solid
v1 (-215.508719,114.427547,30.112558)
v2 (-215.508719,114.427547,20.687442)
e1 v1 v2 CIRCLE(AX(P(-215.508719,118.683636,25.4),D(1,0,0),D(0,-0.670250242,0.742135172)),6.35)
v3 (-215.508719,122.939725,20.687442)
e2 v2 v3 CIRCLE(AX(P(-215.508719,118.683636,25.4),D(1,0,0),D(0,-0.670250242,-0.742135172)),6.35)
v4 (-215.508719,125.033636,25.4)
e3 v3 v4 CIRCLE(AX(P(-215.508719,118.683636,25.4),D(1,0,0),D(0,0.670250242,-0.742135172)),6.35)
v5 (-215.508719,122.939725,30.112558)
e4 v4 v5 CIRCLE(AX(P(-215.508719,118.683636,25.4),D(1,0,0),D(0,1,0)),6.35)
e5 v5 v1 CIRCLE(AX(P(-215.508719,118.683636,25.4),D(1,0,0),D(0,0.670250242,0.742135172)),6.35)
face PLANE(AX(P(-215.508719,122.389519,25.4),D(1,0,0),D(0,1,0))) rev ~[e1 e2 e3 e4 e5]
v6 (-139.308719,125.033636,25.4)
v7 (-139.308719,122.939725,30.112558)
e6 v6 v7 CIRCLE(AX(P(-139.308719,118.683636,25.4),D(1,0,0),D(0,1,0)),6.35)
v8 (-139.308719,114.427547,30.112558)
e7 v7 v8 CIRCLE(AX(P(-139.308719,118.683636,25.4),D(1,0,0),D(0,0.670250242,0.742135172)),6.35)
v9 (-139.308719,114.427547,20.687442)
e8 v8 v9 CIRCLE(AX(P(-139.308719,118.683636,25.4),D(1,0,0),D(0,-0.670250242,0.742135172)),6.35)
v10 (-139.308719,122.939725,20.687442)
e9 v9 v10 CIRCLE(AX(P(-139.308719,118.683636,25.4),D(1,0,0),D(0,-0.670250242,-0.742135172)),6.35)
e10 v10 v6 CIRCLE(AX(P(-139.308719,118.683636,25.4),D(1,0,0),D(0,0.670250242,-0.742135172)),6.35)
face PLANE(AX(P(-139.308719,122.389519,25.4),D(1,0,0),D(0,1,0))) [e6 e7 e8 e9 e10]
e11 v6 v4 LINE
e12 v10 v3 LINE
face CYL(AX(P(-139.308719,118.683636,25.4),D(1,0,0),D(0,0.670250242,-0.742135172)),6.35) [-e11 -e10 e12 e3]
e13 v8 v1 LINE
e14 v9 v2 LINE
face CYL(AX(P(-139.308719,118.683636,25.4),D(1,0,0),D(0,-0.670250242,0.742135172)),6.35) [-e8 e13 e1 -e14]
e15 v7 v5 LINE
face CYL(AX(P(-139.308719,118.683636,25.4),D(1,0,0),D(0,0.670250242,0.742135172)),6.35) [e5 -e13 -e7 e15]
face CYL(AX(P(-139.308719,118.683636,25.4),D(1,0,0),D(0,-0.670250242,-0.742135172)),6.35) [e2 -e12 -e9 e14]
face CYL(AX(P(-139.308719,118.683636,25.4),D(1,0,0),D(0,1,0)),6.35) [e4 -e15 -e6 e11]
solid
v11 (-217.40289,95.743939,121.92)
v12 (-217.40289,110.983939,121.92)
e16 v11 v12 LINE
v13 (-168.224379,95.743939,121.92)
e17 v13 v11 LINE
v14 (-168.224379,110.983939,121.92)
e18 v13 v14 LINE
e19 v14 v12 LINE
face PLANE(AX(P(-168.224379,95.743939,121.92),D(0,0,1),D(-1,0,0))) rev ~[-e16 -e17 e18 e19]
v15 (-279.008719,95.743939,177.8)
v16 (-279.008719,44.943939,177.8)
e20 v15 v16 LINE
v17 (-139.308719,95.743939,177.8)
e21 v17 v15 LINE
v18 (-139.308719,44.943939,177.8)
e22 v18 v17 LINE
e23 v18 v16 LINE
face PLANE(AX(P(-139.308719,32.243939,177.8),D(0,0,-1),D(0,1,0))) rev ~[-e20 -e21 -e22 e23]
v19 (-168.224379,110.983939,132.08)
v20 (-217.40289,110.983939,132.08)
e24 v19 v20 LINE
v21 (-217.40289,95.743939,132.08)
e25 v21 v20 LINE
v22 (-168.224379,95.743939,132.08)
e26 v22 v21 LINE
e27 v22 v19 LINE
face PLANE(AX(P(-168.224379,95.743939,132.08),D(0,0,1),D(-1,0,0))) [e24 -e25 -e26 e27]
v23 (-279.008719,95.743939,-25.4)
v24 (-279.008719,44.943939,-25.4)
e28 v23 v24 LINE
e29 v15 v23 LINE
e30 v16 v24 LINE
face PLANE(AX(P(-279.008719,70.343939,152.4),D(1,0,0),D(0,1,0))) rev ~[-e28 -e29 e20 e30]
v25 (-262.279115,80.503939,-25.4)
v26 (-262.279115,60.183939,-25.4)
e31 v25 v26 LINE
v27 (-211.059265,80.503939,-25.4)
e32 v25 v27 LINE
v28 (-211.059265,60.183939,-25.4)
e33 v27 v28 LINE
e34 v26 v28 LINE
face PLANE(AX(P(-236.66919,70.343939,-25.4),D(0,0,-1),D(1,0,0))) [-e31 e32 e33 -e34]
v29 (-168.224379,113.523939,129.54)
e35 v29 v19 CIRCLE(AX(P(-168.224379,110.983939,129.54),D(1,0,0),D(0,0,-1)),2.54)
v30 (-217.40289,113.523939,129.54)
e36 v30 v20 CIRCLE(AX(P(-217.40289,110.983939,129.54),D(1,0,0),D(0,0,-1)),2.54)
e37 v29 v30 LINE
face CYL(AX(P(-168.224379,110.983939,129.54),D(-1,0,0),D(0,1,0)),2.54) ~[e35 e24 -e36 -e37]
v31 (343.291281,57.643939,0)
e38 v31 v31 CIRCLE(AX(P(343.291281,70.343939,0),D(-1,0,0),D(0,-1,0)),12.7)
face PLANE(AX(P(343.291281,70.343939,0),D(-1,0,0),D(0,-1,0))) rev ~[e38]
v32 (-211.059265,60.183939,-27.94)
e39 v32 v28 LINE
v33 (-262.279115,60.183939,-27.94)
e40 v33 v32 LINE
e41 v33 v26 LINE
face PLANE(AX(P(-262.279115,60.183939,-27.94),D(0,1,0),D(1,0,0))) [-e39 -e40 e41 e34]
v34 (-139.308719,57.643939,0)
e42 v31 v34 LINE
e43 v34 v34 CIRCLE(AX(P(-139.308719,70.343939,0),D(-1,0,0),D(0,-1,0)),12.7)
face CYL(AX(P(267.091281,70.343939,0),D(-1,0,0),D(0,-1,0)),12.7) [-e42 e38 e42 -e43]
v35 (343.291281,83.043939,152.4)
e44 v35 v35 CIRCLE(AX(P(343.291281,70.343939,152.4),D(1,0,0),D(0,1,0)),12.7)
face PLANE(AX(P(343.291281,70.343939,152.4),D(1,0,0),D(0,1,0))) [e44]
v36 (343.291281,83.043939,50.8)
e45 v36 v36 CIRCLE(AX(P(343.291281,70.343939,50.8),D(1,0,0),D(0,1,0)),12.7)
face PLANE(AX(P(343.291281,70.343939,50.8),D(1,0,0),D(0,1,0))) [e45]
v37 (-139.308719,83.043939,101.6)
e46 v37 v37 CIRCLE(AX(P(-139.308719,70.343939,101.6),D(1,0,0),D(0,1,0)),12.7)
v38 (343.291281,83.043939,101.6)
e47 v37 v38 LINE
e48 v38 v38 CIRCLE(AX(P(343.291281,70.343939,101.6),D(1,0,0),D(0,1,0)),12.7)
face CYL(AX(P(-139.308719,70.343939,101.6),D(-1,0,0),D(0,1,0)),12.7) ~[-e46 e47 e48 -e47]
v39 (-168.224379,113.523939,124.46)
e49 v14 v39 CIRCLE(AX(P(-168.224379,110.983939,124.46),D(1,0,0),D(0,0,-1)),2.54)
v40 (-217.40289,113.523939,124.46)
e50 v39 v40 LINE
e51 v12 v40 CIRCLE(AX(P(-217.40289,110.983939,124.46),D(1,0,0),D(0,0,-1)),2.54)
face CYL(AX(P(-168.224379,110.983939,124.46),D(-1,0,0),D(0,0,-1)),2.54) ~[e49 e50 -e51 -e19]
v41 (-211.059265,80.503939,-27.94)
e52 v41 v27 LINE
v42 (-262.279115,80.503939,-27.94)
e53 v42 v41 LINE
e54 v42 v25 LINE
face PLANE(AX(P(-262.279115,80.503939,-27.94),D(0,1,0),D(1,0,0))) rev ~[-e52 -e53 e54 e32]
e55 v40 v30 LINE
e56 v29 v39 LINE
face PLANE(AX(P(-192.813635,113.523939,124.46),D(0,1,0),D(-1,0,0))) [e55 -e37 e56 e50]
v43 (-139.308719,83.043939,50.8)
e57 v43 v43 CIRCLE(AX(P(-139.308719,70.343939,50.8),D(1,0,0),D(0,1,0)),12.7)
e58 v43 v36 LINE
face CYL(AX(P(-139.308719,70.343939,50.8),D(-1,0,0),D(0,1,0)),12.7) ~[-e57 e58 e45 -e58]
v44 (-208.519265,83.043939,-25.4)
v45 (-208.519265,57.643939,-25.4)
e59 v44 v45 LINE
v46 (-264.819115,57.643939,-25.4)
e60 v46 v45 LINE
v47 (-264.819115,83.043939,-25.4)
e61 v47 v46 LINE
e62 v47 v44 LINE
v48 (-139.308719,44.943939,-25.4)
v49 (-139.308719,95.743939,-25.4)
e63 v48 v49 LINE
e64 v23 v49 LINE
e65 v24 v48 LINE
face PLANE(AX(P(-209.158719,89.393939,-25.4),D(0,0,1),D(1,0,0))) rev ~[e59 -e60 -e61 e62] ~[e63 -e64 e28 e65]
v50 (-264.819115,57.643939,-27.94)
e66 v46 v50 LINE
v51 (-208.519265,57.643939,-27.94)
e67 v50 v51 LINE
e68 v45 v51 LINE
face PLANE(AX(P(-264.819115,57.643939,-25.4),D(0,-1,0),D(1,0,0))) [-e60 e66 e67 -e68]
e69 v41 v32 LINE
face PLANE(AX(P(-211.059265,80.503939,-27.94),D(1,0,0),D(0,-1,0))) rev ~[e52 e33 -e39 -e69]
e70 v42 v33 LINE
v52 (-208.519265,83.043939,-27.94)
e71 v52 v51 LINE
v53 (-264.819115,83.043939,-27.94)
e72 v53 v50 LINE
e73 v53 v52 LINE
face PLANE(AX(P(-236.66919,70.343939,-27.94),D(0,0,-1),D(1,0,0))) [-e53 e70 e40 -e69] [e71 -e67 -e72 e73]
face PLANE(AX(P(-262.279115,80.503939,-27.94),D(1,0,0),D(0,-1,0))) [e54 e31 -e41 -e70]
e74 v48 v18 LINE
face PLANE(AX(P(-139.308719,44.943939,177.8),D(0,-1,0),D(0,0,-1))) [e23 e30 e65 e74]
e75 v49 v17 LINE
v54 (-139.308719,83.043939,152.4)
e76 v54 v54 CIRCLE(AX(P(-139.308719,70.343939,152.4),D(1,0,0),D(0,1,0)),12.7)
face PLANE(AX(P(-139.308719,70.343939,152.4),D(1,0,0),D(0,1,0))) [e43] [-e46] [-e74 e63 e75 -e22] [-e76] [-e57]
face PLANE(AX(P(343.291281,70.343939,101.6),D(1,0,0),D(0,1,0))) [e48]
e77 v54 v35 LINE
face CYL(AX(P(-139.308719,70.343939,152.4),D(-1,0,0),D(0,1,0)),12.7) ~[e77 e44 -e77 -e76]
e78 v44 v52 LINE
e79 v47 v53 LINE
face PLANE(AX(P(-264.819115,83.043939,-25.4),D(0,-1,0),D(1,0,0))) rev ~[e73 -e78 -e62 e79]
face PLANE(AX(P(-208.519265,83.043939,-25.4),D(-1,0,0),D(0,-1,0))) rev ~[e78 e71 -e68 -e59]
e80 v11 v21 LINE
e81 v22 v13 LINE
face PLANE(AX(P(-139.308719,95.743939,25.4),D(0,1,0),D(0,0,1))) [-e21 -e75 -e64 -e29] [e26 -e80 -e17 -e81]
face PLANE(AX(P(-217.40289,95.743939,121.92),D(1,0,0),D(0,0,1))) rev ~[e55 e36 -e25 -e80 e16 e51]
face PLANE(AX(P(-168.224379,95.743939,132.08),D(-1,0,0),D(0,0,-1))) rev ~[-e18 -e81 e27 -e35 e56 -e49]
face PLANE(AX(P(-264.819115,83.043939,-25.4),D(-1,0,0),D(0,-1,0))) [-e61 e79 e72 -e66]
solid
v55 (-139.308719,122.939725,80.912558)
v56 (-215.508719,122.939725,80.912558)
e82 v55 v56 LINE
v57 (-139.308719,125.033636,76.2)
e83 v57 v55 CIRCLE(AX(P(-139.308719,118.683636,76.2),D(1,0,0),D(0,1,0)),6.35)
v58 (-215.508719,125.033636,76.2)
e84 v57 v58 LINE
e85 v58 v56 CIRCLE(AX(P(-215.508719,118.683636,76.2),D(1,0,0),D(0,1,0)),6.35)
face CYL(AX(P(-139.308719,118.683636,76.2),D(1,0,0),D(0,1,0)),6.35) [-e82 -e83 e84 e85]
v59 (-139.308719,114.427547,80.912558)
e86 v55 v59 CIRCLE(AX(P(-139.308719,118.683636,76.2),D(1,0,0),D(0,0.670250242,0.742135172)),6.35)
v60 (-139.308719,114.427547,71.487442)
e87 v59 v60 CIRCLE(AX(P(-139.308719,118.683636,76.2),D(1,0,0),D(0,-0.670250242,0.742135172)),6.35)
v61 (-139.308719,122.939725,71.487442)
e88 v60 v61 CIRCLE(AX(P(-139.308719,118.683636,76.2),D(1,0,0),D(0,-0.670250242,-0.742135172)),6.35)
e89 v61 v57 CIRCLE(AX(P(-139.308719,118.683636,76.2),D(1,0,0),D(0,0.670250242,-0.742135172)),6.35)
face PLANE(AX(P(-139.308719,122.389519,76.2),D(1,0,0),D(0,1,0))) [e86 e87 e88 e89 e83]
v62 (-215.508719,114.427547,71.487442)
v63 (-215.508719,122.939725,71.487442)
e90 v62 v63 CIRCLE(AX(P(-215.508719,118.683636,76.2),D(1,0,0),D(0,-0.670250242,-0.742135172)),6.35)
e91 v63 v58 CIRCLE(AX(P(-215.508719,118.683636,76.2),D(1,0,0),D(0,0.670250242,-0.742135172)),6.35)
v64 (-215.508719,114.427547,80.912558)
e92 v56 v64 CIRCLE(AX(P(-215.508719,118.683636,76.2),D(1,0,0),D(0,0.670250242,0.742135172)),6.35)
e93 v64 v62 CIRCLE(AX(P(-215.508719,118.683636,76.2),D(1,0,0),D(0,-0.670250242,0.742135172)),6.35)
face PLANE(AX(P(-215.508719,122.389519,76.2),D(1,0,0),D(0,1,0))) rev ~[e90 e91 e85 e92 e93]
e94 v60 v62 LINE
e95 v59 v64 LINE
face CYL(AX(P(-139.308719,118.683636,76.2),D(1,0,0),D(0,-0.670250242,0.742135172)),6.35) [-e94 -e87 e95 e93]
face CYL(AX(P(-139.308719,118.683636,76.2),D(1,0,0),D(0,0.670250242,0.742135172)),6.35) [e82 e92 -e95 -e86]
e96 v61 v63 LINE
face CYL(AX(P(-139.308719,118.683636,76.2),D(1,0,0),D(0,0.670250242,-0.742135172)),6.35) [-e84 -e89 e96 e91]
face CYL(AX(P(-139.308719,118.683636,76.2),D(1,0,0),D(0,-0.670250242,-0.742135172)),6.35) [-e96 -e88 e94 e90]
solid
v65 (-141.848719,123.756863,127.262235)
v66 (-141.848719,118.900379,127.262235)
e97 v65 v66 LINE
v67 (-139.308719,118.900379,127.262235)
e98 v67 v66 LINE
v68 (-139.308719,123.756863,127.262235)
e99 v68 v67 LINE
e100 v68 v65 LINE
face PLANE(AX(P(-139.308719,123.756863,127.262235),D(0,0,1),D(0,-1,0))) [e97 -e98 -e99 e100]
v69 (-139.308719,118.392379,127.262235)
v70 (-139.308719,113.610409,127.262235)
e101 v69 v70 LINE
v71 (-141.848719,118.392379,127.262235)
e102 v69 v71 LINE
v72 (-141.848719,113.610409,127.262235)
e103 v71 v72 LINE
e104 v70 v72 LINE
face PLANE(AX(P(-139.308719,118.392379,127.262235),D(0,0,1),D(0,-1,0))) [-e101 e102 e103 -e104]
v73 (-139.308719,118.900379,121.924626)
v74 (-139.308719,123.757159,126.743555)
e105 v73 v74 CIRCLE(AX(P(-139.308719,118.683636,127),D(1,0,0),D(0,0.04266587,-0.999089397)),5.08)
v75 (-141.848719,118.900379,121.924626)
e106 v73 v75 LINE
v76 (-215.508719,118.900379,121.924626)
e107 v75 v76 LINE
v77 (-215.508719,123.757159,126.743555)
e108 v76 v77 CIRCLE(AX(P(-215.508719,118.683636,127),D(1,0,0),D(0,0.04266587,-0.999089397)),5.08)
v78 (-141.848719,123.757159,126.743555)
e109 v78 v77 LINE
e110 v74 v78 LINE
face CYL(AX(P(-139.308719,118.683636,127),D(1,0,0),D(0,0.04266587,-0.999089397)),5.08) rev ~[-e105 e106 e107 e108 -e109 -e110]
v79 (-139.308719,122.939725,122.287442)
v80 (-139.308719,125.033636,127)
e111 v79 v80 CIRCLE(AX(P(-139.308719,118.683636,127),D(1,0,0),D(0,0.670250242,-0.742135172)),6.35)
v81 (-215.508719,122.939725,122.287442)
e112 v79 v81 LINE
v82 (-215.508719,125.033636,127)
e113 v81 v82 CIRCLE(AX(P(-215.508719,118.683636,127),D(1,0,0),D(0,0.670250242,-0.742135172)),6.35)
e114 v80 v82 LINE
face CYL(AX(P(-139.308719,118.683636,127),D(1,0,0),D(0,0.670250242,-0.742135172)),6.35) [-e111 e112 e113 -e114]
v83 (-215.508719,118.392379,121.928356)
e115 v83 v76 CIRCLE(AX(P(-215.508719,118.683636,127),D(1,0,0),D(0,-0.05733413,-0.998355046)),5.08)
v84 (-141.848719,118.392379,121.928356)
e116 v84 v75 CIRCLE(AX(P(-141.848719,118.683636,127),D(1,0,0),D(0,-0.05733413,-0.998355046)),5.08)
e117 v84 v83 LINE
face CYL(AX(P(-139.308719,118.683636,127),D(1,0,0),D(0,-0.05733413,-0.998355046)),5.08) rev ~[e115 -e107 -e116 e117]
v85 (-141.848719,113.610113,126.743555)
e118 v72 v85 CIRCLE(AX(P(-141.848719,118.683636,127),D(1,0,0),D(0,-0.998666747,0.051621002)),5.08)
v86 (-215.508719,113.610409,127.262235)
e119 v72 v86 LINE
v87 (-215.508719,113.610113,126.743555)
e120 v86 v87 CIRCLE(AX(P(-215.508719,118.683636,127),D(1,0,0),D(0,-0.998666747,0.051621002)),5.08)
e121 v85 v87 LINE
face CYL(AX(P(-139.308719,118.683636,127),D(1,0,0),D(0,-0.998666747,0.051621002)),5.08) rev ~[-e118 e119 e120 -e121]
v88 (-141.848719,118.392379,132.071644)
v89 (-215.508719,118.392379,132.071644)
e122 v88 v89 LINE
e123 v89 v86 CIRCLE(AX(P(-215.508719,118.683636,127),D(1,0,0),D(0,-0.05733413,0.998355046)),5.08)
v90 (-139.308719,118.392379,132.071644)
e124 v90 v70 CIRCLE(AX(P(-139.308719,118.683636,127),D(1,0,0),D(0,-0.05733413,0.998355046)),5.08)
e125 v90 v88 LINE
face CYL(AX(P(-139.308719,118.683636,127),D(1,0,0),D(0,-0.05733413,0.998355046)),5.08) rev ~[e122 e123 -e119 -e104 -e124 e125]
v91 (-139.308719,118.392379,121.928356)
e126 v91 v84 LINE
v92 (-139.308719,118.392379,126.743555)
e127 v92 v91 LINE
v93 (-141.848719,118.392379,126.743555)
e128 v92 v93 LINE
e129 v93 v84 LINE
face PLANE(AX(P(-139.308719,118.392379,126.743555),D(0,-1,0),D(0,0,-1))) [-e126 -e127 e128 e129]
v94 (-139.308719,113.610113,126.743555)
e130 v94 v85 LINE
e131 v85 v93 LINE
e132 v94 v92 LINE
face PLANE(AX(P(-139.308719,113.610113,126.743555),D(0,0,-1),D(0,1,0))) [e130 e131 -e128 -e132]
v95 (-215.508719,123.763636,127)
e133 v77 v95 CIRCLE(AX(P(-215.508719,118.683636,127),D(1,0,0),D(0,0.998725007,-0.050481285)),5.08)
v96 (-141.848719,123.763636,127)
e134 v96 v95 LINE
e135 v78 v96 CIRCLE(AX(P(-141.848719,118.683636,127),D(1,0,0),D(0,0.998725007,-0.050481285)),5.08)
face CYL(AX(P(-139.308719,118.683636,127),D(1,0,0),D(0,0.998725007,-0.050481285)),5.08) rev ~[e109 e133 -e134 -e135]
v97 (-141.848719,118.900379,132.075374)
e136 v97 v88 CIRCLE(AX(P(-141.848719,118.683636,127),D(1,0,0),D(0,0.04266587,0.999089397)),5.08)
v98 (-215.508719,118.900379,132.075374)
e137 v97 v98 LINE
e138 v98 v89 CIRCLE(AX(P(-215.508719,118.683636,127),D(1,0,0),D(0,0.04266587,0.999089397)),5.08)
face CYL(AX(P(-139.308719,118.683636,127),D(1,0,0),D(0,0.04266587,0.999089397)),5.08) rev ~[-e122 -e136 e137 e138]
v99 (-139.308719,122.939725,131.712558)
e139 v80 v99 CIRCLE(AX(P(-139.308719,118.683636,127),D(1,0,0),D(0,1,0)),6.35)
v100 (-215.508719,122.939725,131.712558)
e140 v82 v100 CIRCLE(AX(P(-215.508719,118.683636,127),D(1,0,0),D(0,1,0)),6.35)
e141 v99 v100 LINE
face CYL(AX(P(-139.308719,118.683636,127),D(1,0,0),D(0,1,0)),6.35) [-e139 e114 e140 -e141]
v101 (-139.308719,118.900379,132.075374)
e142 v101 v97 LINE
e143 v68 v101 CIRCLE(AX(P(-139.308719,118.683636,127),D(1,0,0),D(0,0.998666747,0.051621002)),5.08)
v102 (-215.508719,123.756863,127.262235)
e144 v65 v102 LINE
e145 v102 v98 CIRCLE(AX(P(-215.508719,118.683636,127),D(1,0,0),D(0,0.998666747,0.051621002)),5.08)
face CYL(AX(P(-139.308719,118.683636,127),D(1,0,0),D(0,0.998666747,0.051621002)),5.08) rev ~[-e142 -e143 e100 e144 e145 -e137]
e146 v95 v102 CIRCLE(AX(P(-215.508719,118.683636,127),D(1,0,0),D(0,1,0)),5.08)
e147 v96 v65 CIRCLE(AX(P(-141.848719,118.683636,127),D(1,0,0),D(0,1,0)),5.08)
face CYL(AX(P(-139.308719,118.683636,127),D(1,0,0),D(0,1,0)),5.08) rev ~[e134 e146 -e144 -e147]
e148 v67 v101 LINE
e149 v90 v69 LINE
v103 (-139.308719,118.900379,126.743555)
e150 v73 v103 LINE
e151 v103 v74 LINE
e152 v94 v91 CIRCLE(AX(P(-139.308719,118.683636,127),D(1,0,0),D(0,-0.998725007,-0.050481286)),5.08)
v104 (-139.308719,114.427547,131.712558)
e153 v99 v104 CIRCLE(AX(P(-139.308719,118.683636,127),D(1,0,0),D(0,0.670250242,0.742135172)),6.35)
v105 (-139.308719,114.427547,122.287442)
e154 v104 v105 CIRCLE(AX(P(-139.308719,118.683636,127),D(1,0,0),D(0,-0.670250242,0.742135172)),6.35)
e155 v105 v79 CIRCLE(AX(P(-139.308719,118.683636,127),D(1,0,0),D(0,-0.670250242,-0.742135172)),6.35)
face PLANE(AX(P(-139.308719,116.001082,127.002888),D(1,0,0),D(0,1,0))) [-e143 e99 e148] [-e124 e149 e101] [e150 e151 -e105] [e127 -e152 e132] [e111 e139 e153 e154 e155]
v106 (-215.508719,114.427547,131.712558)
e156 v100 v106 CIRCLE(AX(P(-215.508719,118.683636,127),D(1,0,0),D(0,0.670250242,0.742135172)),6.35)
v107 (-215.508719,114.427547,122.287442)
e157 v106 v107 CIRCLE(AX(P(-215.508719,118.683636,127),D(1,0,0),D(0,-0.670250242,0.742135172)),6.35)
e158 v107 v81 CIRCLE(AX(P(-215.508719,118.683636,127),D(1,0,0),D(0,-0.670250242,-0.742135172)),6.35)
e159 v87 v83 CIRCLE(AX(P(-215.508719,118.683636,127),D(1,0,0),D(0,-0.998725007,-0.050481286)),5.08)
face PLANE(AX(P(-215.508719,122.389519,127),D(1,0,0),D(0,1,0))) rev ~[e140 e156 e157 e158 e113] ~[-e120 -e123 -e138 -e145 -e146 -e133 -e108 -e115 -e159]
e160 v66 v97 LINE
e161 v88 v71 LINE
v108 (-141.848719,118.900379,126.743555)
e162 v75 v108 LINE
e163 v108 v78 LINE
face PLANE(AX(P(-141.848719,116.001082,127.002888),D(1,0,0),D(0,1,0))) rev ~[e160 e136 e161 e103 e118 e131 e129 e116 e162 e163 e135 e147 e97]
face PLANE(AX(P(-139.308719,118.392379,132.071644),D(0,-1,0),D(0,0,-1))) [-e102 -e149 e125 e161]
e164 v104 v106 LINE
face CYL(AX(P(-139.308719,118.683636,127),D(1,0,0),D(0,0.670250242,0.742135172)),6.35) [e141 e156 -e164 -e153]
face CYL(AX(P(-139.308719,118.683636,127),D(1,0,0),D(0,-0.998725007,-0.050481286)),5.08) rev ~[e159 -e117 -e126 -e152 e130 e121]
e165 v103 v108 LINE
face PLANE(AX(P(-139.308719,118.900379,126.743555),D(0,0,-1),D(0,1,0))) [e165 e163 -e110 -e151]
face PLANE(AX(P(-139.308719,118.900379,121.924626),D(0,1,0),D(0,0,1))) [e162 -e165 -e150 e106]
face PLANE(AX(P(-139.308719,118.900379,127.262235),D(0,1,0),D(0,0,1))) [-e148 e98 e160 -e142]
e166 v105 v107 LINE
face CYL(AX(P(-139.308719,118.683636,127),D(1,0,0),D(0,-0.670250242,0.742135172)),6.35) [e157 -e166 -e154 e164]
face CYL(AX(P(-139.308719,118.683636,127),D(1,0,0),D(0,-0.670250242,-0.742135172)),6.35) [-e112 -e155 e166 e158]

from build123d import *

# Parameters (mm, degrees)
F0_W      = 406.4
F0_H      = 12.7
F0_W_2    = 139.7
F0_H_2    = 38.1
F2_DEPTH  = 25.4
F3_DEPTH  = 25.4
F4_DEPTH  = 76.2
F5_W      = 76.2
F5_H      = 50.8
F6_DEPTH  = 139.7
F7_R      = 12.7
F8_DEPTH  = 482.6
F9_DEPTH  = 7.62
F10_W     = 56.2998503447
F10_H     = 25.4
F11_DEPTH = 2.54
F12_W     = 51.2198503447
F12_H     = 20.32
F13_DEPTH = 2.54
F14_DEPTH = 12.7
F15_DEPTH = 12.7
F18_DEPTH = 76.2
F20_DEPTH = 127
F19_W     = 0.508
F19_H     = 0.5186796188
F21_DEPTH = 101.6
F22_DEPTH = 2.54
F17_W     = 49.1785109043
F17_H     = 5.08
F23_DEPTH = 17.78
F24_R     = 2.54
F25_R     = 2.54


with BuildPart() as f1:
    # F0 (on Top) → F1 (revolve)
    with BuildSketch(Plane.XY):
        with Locations((63.891280989, 63.9939386676)):
            Rectangle(F0_W, F0_H)
    revolve(axis=Axis((63.891280989, 70.3439386676, 0), (-1, 0, 0)))

    # F0 (on Top) → F2 (join)
    with BuildSketch(Plane.XY):
        with Locations((-209.158719011, 89.3939386676)):
            Rectangle(F0_W_2, F0_H_2)
        Polygon((-139.308719011, 57.6439386676), (-139.308719011, 70.3439386676), (-279.008719011, 70.3439386676), (-279.008719011, 32.2439386676), (-139.308719011, 32.2439386676), align=None)
    extrude(amount=F2_DEPTH)

    # F0 (on Top) → F3 (join)
    with BuildSketch(Plane.XY):
        with Locations((-209.158719011, 89.3939386676)):
            Rectangle(F0_W_2, F0_H_2)
        Polygon((-139.308719011, 57.6439386676), (-139.308719011, 70.3439386676), (-279.008719011, 70.3439386676), (-279.008719011, 32.2439386676), (-139.308719011, 32.2439386676), align=None)
    extrude(amount=-F3_DEPTH)

    # F4 (add): a face of the model
    f4_faces = [f1.faces().sort_by_distance(p)[0] for p in [
        (267.091280989, 70.3439386676, 0),
    ]]
    extrude(f4_faces, amount=F4_DEPTH)

    # F5 (on face) → F6 (join)
    with BuildSketch(Plane.YZ.offset(-139.308719011)):
        with Locations((70.3439386676, 152.4)):
            Rectangle(F5_W, F5_H)
        with Locations((70.3439386676, 101.6)):
            Rectangle(F5_W, F5_H)
        with Locations((70.3439386676, 50.8)):
            Rectangle(F5_W, F5_H)
    extrude(amount=-F6_DEPTH)

    # F7 (on face) → F8 (join)
    with BuildSketch(Plane.YZ.offset(-139.308719011)):
        with Locations((70.3439386676, 50.8)):
            Circle(F7_R)
        with Locations((70.3439386676, 101.6)):
            Circle(F7_R)
        with Locations((70.3439386676, 152.4)):
            Circle(F7_R)
    extrude(amount=F8_DEPTH)

    # F9 (add): faces of the model
    f9_faces = [f1.faces().sort_by_distance(p)[0] for p in [
        (-209.158719011, 108.4439386676, 0),
        (-209.158719011, 108.4439386676, 101.6),
    ]]
    extrude(f9_faces, amount=-F9_DEPTH)

    # F10 (on face) → F11 (join)
    with BuildSketch(Plane(origin=(0, 0, -25.4), x_dir=(1, 0, 0), z_dir=(0, 0, -1))):
        with Locations((-236.669190228, -70.3439386676)):
            Rectangle(F10_W, F10_H)
    extrude(amount=F11_DEPTH)

    # F12 (on face) → F13 (cut)
    with BuildSketch(Plane(origin=(0, 0, -27.94), x_dir=(1, 0, 0), z_dir=(0, 0, -1))):
        with Locations((-236.669190228, -70.3439386676)):
            Rectangle(F12_W, F12_H)
    extrude(amount=-F13_DEPTH, mode=Mode.SUBTRACT)

    # F14 (cut): faces of the model
    f14_faces = [f1.faces().sort_by_distance(p)[0] for p in [
        (-209.158719011, 108.4439386676, 0),
        (-209.158719011, 108.4439386676, 101.6),
    ]]
    extrude(f14_faces, amount=-F14_DEPTH, mode=Mode.SUBTRACT)

    # F15 (cut): faces of the model
    f15_faces = [f1.faces().sort_by_distance(p)[0] for p in [
        (-209.158719011, 32.2439386676, 0),
        (-209.158719011, 32.2439386676, 101.6),
    ]]
    extrude(f15_faces, amount=-F15_DEPTH, mode=Mode.SUBTRACT)

    # F17 (on face) → F23 (join)
    with BuildSketch(Plane(origin=(0, 95.7439386676, 0), x_dir=(-1, 0, 0), z_dir=(0, 1, 0))):
        with Locations((192.8136348724, 124.46)):
            Rectangle(F17_W, F17_H)
        with Locations((192.8136348724, 129.54)):
            Rectangle(F17_W, F17_H)
    extrude(amount=F23_DEPTH)

    # F24
    f24_edges = [f1.edges().sort_by_distance(p)[0] for p in [
        (-192.813635, 113.523939, 121.92),
    ]]
    fillet(f24_edges, radius=F24_R)

    # F25
    f25_edges = [f1.edges().sort_by_distance(p)[0] for p in [
        (-192.813635, 113.523939, 132.08),
    ]]
    fillet(f25_edges, radius=F25_R)


with BuildPart() as f18:
    # F16 (on face) → F18 (new body)
    with BuildSketch(Plane.YZ.offset(-139.308719011)):
        with BuildLine():
            ThreePointArc((125.0336358821, 25.4), (124.4865948415, 27.9784040248), (122.9397249166, 30.1125583423))
            Line((122.9397249166, 30.1125583423), (118.6836358821, 25.4))
            Line((118.6836358821, 25.4), (122.9397249166, 20.6874416577))
            ThreePointArc((122.9397249166, 20.6874416577), (124.4865948415, 22.8215959752), (125.0336358821, 25.4))
        make_face()
        with BuildLine():
            Line((122.9397249166, 20.6874416577), (118.6836358821, 25.4))
            Line((118.6836358821, 25.4), (114.4275468475, 20.6874416577))
            ThreePointArc((114.4275468475, 20.6874416577), (118.6836358821, 19.05), (122.9397249166, 20.6874416577))
        make_face()
        with BuildLine():
            Line((118.6836358821, 25.4), (114.4275468475, 30.1125583423))
            ThreePointArc((114.4275468475, 30.1125583423), (112.3336358821, 25.4), (114.4275468475, 20.6874416577))
            Line((114.4275468475, 20.6874416577), (118.6836358821, 25.4))
        make_face()
        with BuildLine():
            ThreePointArc((122.9397249166, 30.1125583423), (118.6836358821, 31.75), (114.4275468475, 30.1125583423))
            Line((114.4275468475, 30.1125583423), (118.6836358821, 25.4))
            Line((118.6836358821, 25.4), (122.9397249166, 30.1125583423))
        make_face()
    extrude(amount=-F18_DEPTH)


with BuildPart() as f18b:
    # F16 (on face) → F18, piece 2 (new body)
    with BuildSketch(Plane.YZ.offset(-139.308719011)):
        with BuildLine():
            ThreePointArc((125.0336358821, 76.2), (124.4865948415, 78.7784040248), (122.9397249166, 80.9125583423))
            Line((122.9397249166, 80.9125583423), (118.6836358821, 76.2))
            Line((118.6836358821, 76.2), (122.9397249166, 71.4874416577))
            ThreePointArc((122.9397249166, 71.4874416577), (124.4865948415, 73.6215959752), (125.0336358821, 76.2))
        make_face()
        with BuildLine():
            Line((118.6836358821, 76.2), (114.4275468475, 71.4874416577))
            ThreePointArc((114.4275468475, 71.4874416577), (118.6836358821, 69.85), (122.9397249166, 71.4874416577))
            Line((122.9397249166, 71.4874416577), (118.6836358821, 76.2))
        make_face()
        with BuildLine():
            Line((118.6836358821, 76.2), (114.4275468475, 80.9125583423))
            ThreePointArc((114.4275468475, 80.9125583423), (112.3336358821, 76.2), (114.4275468475, 71.4874416577))
            Line((114.4275468475, 71.4874416577), (118.6836358821, 76.2))
        make_face()
        with BuildLine():
            ThreePointArc((122.9397249166, 80.9125583423), (118.6836358821, 82.55), (114.4275468475, 80.9125583423))
            Line((114.4275468475, 80.9125583423), (118.6836358821, 76.2))
            Line((118.6836358821, 76.2), (122.9397249166, 80.9125583423))
        make_face()
    extrude(amount=-F18_DEPTH)


with BuildPart() as f18c:
    # F16 (on face) → F18, piece 3 (new body)
    with BuildSketch(Plane.YZ.offset(-139.308719011)):
        with BuildLine():
            ThreePointArc((125.0336358821, 127), (124.4865948415, 129.5784040248), (122.9397249166, 131.7125583423))
            Line((122.9397249166, 131.7125583423), (118.6836358821, 127))
            Line((118.6836358821, 127), (122.9397249166, 122.2874416577))
            ThreePointArc((122.9397249166, 122.2874416577), (124.4865948415, 124.4215959752), (125.0336358821, 127))
        make_face()
        with BuildLine():
            Line((118.6836358821, 127), (114.4275468475, 122.2874416577))
            ThreePointArc((114.4275468475, 122.2874416577), (118.6836358821, 120.65), (122.9397249166, 122.2874416577))
            Line((122.9397249166, 122.2874416577), (118.6836358821, 127))
        make_face()
        with BuildLine():
            Line((118.6836358821, 127), (114.4275468475, 131.7125583423))
            ThreePointArc((114.4275468475, 131.7125583423), (112.3336358821, 127), (114.4275468475, 122.2874416577))
            Line((114.4275468475, 122.2874416577), (118.6836358821, 127))
        make_face()
        with BuildLine():
            ThreePointArc((122.9397249166, 131.7125583423), (118.6836358821, 133.35), (114.4275468475, 131.7125583423))
            Line((114.4275468475, 131.7125583423), (118.6836358821, 127))
            Line((118.6836358821, 127), (122.9397249166, 131.7125583423))
        make_face()
    extrude(amount=-F18_DEPTH)

    # F19 (on face) → F20 (cut)
    with BuildSketch(Plane.YZ.offset(-139.308719011)):
        with BuildLine():
            ThreePointArc((118.3923785006, 132.0716436328), (115.0812718007, 130.5818114168), (113.6104088057, 127.2622346878))
            Line((113.6104088057, 127.2622346878), (118.3923785006, 127.2622346878))
            Line((118.3923785006, 127.2622346878), (118.3923785006, 131.1406195164))
            Line((118.3923785006, 131.1406195164), (118.3923785006, 132.0716436328))
        make_face()
        with BuildLine():
            Line((118.3923785006, 126.743555069), (113.610112846, 126.743555069))
            ThreePointArc((113.610112846, 126.743555069), (115.0792285984, 123.4202446824), (118.3923785006, 121.9283563672))
            Line((118.3923785006, 121.9283563672), (118.3923785006, 126.743555069))
        make_face()
        with BuildLine():
            Line((123.7571589181, 126.743555069), (118.9003785006, 126.743555069))
            Line((118.9003785006, 126.743555069), (118.9003785006, 121.9246258623))
            ThreePointArc((118.9003785006, 121.9246258623), (122.2616587088, 123.3938729014), (123.7571589181, 126.743555069))
        make_face()
        with BuildLine():
            Line((118.9003785006, 131.1406195164), (118.9003785006, 127.2622346878))
            Line((118.9003785006, 127.2622346878), (123.7568629584, 127.2622346878))
            ThreePointArc((123.7568629584, 127.2622346878), (122.259600463, 130.6081681385), (118.9003785006, 132.0753741377))
            Line((118.9003785006, 132.0753741377), (118.9003785006, 131.1406195164))
        make_face()
    extrude(amount=-F20_DEPTH, mode=Mode.SUBTRACT)

    # F19 (on face) → F21 (cut)
    with BuildSketch(Plane.YZ.offset(-139.308719011)):
        with BuildLine():
            Line((118.9003785006, 126.743555069), (118.3923785006, 126.743555069))
            Line((118.3923785006, 126.743555069), (118.3923785006, 121.9283563672))
            ThreePointArc((118.3923785006, 121.9283563672), (118.6463318388, 121.9201369695), (118.9003785006, 121.9246258623))
            Line((118.9003785006, 121.9246258623), (118.9003785006, 126.743555069))
        make_face()
        with BuildLine():
            Line((118.3923785006, 127.2622346878), (113.6104088057, 127.2622346878))
            ThreePointArc((113.6104088057, 127.2622346878), (113.603636709, 127.0028986581), (113.610112846, 126.743555069))
            Line((113.610112846, 126.743555069), (118.3923785006, 126.743555069))
            Line((118.3923785006, 126.743555069), (118.3923785006, 127.2622346878))
        make_face()
        with BuildLine():
            Line((118.3923785006, 131.1406195164), (118.3923785006, 127.2622346878))
            Line((118.3923785006, 127.2622346878), (118.9003785006, 127.2622346878))
            Line((118.9003785006, 127.2622346878), (118.9003785006, 131.1406195164))
            Line((118.9003785006, 131.1406195164), (118.9003785006, 132.0753741377))
            ThreePointArc((118.9003785006, 132.0753741377), (118.6463318388, 132.0798630305), (118.3923785006, 132.0716436328))
            Line((118.3923785006, 132.0716436328), (118.3923785006, 131.1406195164))
        make_face()
        with BuildLine():
            Line((123.7568629584, 127.2622346878), (118.9003785006, 127.2622346878))
            Line((118.9003785006, 127.2622346878), (118.9003785006, 126.743555069))
            Line((118.9003785006, 126.743555069), (123.7571589181, 126.743555069))
            ThreePointArc((123.7571589181, 126.743555069), (123.7620163829, 126.8717366442), (123.7636358821, 127))
            ThreePointArc((123.7636358821, 127), (123.7619423689, 127.1311610689), (123.7568629584, 127.2622346878))
        make_face()
        with Locations((118.6463785006, 127.0028948784)):
            Rectangle(F19_W, F19_H)
    extrude(amount=-F21_DEPTH, mode=Mode.SUBTRACT)

    # F19 (on face) → F22 (join)
    with BuildSketch(Plane.YZ.offset(-139.308719011)):
        with BuildLine():
            Line((118.3923785006, 127.2622346878), (113.6104088057, 127.2622346878))
            ThreePointArc((113.6104088057, 127.2622346878), (113.603636709, 127.0028986581), (113.610112846, 126.743555069))
            Line((113.610112846, 126.743555069), (118.3923785006, 126.743555069))
            Line((118.3923785006, 126.743555069), (118.3923785006, 127.2622346878))
        make_face()
        with BuildLine():
            Line((118.3923785006, 131.1406195164), (118.3923785006, 127.2622346878))
            Line((118.3923785006, 127.2622346878), (118.9003785006, 127.2622346878))
            Line((118.9003785006, 127.2622346878), (118.9003785006, 131.1406195164))
            Line((118.9003785006, 131.1406195164), (118.9003785006, 132.0753741377))
            ThreePointArc((118.9003785006, 132.0753741377), (118.6463318388, 132.0798630305), (118.3923785006, 132.0716436328))
            Line((118.3923785006, 132.0716436328), (118.3923785006, 131.1406195164))
        make_face()
        with BuildLine():
            Line((118.9003785006, 126.743555069), (118.3923785006, 126.743555069))
            Line((118.3923785006, 126.743555069), (118.3923785006, 121.9283563672))
            ThreePointArc((118.3923785006, 121.9283563672), (118.6463318388, 121.9201369695), (118.9003785006, 121.9246258623))
            Line((118.9003785006, 121.9246258623), (118.9003785006, 126.743555069))
        make_face()
        with BuildLine():
            Line((123.7568629584, 127.2622346878), (118.9003785006, 127.2622346878))
            Line((118.9003785006, 127.2622346878), (118.9003785006, 126.743555069))
            Line((118.9003785006, 126.743555069), (123.7571589181, 126.743555069))
            ThreePointArc((123.7571589181, 126.743555069), (123.7620163829, 126.8717366442), (123.7636358821, 127))
            ThreePointArc((123.7636358821, 127), (123.7619423689, 127.1311610689), (123.7568629584, 127.2622346878))
        make_face()
        with Locations((118.6463785006, 127.0028948784)):
            Rectangle(F19_W, F19_H)
    extrude(amount=-F22_DEPTH)


solid = Compound([f1.part, f18.part, f18b.part, f18c.part])
